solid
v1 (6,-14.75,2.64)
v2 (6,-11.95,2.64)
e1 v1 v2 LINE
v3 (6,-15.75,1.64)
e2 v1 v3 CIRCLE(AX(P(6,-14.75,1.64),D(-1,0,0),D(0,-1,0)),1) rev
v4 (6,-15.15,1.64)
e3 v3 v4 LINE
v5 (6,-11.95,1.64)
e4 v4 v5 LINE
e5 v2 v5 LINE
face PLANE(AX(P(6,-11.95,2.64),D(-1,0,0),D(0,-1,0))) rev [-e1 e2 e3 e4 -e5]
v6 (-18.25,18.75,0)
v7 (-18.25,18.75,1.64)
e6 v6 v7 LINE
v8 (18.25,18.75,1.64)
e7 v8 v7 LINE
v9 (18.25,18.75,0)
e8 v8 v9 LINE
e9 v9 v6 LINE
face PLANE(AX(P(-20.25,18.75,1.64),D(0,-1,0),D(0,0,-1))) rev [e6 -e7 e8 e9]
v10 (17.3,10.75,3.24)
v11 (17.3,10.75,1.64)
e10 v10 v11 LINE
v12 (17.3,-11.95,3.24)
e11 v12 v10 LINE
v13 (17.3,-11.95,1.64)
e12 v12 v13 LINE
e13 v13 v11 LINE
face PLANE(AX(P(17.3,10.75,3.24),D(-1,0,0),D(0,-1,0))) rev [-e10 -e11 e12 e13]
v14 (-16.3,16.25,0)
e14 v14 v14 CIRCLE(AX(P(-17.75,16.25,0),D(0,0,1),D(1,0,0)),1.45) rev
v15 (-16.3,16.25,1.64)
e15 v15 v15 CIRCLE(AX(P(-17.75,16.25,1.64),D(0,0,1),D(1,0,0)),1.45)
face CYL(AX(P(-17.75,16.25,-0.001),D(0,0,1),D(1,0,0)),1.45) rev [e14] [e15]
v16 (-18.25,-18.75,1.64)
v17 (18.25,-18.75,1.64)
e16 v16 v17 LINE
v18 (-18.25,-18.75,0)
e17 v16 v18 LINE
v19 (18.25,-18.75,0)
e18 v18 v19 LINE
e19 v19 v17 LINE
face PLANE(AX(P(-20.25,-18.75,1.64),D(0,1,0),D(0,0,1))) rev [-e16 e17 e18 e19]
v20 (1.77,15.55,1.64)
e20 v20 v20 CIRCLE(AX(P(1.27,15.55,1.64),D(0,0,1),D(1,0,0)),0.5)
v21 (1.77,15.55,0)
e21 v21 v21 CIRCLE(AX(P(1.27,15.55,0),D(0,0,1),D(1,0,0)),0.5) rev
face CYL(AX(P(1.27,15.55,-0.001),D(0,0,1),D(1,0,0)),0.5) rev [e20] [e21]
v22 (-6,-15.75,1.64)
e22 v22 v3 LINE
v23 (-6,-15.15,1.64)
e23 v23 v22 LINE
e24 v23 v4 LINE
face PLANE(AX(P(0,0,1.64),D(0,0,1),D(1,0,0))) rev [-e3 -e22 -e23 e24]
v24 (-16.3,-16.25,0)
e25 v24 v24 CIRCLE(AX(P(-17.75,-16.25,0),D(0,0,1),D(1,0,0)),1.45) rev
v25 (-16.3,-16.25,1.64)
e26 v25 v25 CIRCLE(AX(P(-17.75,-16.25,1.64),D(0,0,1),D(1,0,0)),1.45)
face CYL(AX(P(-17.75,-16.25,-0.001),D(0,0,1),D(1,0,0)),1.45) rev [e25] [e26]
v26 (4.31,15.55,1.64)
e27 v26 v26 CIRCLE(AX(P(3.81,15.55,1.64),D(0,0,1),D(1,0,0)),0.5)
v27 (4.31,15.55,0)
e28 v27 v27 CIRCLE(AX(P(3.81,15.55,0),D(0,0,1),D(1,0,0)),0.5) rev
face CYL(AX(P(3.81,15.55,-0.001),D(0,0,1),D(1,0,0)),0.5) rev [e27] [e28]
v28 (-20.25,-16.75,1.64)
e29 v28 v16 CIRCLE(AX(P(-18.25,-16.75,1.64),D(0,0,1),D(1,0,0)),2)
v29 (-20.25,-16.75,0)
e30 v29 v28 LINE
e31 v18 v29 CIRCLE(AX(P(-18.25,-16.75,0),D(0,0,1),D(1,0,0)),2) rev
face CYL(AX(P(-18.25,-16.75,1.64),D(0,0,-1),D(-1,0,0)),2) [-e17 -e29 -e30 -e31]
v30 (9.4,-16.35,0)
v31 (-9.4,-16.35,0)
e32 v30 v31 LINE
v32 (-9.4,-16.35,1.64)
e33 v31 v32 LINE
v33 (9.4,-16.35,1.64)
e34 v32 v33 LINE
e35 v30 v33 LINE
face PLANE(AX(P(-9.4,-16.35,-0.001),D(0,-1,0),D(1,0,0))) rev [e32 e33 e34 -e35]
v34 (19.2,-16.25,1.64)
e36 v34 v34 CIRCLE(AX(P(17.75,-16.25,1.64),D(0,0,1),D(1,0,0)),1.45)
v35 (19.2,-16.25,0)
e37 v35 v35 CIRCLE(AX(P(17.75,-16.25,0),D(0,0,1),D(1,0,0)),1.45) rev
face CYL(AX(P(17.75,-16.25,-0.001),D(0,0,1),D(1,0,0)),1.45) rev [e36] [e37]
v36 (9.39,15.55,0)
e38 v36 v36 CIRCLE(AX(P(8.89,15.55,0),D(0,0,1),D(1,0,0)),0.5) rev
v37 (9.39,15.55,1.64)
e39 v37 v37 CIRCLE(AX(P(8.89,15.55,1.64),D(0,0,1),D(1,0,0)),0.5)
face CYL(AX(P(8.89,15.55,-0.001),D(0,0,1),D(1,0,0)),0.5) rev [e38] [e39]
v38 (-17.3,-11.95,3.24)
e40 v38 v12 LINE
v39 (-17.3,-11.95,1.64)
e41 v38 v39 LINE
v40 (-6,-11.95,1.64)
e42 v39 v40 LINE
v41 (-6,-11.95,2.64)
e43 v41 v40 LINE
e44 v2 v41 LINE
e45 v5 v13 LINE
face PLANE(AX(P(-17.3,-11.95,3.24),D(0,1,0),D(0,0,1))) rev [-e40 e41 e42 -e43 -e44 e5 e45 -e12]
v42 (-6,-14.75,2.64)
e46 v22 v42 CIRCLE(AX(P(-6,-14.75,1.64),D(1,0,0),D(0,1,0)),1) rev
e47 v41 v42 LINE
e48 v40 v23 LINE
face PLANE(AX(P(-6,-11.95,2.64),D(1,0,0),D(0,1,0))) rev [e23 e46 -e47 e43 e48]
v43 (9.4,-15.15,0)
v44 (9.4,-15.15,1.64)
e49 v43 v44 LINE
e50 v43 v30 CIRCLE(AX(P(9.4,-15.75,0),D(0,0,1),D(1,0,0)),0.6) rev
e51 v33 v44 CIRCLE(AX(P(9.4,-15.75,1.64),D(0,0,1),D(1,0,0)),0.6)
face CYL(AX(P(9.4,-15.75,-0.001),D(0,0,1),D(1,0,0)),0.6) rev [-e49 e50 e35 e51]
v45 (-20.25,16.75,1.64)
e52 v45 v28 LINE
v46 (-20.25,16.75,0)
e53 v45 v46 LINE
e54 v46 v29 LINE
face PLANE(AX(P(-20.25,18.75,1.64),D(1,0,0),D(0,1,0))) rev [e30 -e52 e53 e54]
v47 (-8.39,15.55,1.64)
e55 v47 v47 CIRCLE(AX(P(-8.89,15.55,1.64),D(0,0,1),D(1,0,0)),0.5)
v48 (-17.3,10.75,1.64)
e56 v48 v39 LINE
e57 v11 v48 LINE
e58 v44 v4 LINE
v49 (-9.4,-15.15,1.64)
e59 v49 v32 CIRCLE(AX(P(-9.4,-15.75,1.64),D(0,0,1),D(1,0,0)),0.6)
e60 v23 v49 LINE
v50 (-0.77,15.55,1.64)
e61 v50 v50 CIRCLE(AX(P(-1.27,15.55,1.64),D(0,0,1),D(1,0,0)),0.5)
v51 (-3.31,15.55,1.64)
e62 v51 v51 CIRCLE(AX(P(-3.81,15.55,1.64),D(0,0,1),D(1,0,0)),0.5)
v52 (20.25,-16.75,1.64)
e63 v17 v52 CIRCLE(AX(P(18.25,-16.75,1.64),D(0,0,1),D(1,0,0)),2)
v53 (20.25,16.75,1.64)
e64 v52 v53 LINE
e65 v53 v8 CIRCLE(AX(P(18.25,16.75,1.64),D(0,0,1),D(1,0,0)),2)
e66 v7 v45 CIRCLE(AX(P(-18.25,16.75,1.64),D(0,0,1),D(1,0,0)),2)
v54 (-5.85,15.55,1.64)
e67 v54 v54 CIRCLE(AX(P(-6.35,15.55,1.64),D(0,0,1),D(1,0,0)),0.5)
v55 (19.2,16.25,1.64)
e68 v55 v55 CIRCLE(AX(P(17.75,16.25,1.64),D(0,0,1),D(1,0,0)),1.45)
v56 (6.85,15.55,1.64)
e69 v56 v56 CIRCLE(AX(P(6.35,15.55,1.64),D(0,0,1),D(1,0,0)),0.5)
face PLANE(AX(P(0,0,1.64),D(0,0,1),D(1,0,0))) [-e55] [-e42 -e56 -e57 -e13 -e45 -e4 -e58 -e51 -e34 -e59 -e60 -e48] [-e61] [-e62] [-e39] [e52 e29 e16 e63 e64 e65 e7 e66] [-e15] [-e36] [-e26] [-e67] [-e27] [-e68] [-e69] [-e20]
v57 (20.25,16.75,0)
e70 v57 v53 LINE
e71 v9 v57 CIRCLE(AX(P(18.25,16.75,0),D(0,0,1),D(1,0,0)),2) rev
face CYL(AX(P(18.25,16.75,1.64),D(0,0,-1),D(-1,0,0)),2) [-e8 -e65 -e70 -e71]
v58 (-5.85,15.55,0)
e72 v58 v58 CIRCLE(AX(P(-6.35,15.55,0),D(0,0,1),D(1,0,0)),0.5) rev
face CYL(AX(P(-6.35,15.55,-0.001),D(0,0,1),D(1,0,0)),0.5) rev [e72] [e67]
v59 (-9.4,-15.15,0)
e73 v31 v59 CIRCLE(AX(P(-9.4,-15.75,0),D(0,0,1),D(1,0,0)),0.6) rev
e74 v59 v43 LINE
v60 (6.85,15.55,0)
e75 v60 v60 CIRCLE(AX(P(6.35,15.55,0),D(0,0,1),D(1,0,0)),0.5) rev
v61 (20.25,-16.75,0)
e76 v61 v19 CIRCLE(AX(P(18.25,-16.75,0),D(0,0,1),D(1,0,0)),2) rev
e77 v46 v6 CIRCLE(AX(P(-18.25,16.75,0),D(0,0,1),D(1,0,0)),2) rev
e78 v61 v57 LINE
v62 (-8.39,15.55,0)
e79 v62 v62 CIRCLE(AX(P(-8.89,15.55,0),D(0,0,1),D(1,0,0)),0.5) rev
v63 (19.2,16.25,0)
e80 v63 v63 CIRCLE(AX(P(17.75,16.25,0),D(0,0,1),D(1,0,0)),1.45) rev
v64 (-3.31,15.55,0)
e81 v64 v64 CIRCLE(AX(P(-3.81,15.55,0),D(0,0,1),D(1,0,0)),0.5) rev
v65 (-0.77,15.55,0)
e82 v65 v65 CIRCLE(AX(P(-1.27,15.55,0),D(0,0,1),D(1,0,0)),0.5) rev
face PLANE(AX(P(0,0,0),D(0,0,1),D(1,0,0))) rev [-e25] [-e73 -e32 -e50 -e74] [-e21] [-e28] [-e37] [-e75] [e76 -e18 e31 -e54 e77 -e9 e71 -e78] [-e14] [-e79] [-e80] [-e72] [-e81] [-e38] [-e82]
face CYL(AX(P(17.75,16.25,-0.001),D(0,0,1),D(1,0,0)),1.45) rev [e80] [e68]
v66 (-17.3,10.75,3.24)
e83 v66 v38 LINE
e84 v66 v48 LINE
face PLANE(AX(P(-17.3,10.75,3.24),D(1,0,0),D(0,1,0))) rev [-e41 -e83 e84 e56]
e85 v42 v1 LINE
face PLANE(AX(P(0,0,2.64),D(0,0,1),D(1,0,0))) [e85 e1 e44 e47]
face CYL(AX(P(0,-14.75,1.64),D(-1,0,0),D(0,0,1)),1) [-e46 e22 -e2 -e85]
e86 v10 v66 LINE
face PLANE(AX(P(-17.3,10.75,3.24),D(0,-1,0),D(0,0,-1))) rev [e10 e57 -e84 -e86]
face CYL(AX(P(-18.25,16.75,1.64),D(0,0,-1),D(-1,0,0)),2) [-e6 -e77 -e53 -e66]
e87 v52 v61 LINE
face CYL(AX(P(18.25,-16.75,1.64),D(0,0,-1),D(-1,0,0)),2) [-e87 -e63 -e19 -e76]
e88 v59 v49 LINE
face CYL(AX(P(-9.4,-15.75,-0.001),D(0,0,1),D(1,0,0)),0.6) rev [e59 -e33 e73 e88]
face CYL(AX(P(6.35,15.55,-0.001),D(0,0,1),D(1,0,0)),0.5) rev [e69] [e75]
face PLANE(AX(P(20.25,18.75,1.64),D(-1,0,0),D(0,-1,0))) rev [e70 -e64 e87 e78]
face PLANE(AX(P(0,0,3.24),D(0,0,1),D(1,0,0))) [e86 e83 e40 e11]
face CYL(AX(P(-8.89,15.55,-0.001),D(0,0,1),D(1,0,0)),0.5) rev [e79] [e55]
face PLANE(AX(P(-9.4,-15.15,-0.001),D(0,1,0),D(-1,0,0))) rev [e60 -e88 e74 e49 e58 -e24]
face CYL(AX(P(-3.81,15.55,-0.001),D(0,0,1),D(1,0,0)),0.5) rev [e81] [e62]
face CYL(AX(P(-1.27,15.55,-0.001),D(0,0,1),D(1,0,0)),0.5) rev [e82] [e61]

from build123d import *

# Parameters (mm, degrees)
SKETCH1_W           = 40.5
SKETCH1_H           = 37.5
PCB_DEPTH           = 1.64
FILLET1_R           = 2
MOUNT_HOLE_REACH    = 29.646
SKETCH2_R           = 1.45
SLOT_REACH          = 29.646
CUT_EXTRUDE3_REACH  = 29.646
SKETCH4_R           = 0.5
SKETCH5_W           = 34.6
SKETCH5_H           = 22.7
OLED_GLASS_DEPTH    = 1.6
SKETCH6_W           = 12
SKETCH6_H           = 3.8
BOSS_EXTRUDE3_DEPTH = 1
FILLET2_R           = 1


with BuildPart() as part:
    # Sketch1 → PCB (new body)
    with BuildSketch(Plane.XY):
        Rectangle(SKETCH1_W, SKETCH1_H)
    extrude(amount=PCB_DEPTH)

    # Fillet1
    fillet1_edges = [part.edges().sort_by_distance(p)[0] for p in [
        (-20.25, 18.75, 0.82),
        (20.25, 18.75, 0.82),
        (20.25, -18.75, 0.82),
        (-20.25, -18.75, 0.82),
    ]]
    fillet(fillet1_edges, radius=FILLET1_R)

    # Sketch2 → mount hole (cut, up to next)
    with BuildSketch(Plane.XY.offset(1.64), mode=Mode.PRIVATE) as mount_hole_sk1:
        with Locations((-17.75, 16.25)):
            Circle(SKETCH2_R)
    mount_hole_tool1 = extrude(mount_hole_sk1.sketch, amount=-MOUNT_HOLE_REACH, mode=Mode.PRIVATE) & part.part
    # Sketch2 → mount hole (cut, up to next)
    with BuildSketch(Plane.XY.offset(1.64), mode=Mode.PRIVATE) as mount_hole_sk2:
        with Locations((17.75, 16.25)):
            Circle(SKETCH2_R)
    mount_hole_tool2 = extrude(mount_hole_sk2.sketch, amount=-MOUNT_HOLE_REACH, mode=Mode.PRIVATE) & part.part
    # Sketch2 → mount hole (cut, up to next)
    with BuildSketch(Plane.XY.offset(1.64), mode=Mode.PRIVATE) as mount_hole_sk3:
        with Locations((17.75, -16.25)):
            Circle(SKETCH2_R)
    mount_hole_tool3 = extrude(mount_hole_sk3.sketch, amount=-MOUNT_HOLE_REACH, mode=Mode.PRIVATE) & part.part
    # Sketch2 → mount hole (cut, up to next)
    with BuildSketch(Plane.XY.offset(1.64), mode=Mode.PRIVATE) as mount_hole_sk4:
        with Locations((-17.75, -16.25)):
            Circle(SKETCH2_R)
    mount_hole_tool4 = extrude(mount_hole_sk4.sketch, amount=-MOUNT_HOLE_REACH, mode=Mode.PRIVATE) & part.part
    add(mount_hole_tool1.solids().sort_by_distance((-17.75, 16.25, 1.64))[0], mode=Mode.SUBTRACT)
    add(mount_hole_tool2.solids().sort_by_distance((17.75, 16.25, 1.64))[0], mode=Mode.SUBTRACT)
    add(mount_hole_tool3.solids().sort_by_distance((17.75, -16.25, 1.64))[0], mode=Mode.SUBTRACT)
    add(mount_hole_tool4.solids().sort_by_distance((-17.75, -16.25, 1.64))[0], mode=Mode.SUBTRACT)

    # Sketch3 → slot (cut, up to next)
    with BuildSketch(Plane.XY.offset(1.64), mode=Mode.PRIVATE) as slot_sk1:
        with BuildLine():
            Line((-9.4, -15.15), (9.4, -15.15))
            ThreePointArc((9.4, -15.15), (10, -15.75), (9.4, -16.35))
            Line((9.4, -16.35), (-9.4, -16.35))
            ThreePointArc((-9.4, -16.35), (-10, -15.75), (-9.4, -15.15))
        make_face()
    slot_tool1 = extrude(slot_sk1.sketch, amount=-SLOT_REACH, mode=Mode.PRIVATE) & part.part
    add(slot_tool1.solids().sort_by_distance((0, -15.75, 1.64))[0], mode=Mode.SUBTRACT)

    # Sketch4 → Cut-Extrude3 (cut, up to next)
    with BuildSketch(Plane.XY.offset(1.64), mode=Mode.PRIVATE) as cut_extrude3_sk1:
        with Locations((-8.89, 15.55)):
            Circle(SKETCH4_R)
    cut_extrude3_tool1 = extrude(cut_extrude3_sk1.sketch, amount=-CUT_EXTRUDE3_REACH, mode=Mode.PRIVATE) & part.part
    # Sketch4 → Cut-Extrude3 (cut, up to next)
    with BuildSketch(Plane.XY.offset(1.64), mode=Mode.PRIVATE) as cut_extrude3_sk2:
        with Locations((-6.35, 15.55)):
            Circle(SKETCH4_R)
    cut_extrude3_tool2 = extrude(cut_extrude3_sk2.sketch, amount=-CUT_EXTRUDE3_REACH, mode=Mode.PRIVATE) & part.part
    # Sketch4 → Cut-Extrude3 (cut, up to next)
    with BuildSketch(Plane.XY.offset(1.64), mode=Mode.PRIVATE) as cut_extrude3_sk3:
        with Locations((-3.81, 15.55)):
            Circle(SKETCH4_R)
    cut_extrude3_tool3 = extrude(cut_extrude3_sk3.sketch, amount=-CUT_EXTRUDE3_REACH, mode=Mode.PRIVATE) & part.part
    # Sketch4 → Cut-Extrude3 (cut, up to next)
    with BuildSketch(Plane.XY.offset(1.64), mode=Mode.PRIVATE) as cut_extrude3_sk4:
        with Locations((-1.27, 15.55)):
            Circle(SKETCH4_R)
    cut_extrude3_tool4 = extrude(cut_extrude3_sk4.sketch, amount=-CUT_EXTRUDE3_REACH, mode=Mode.PRIVATE) & part.part
    # Sketch4 → Cut-Extrude3 (cut, up to next)
    with BuildSketch(Plane.XY.offset(1.64), mode=Mode.PRIVATE) as cut_extrude3_sk5:
        with Locations((1.27, 15.55)):
            Circle(SKETCH4_R)
    cut_extrude3_tool5 = extrude(cut_extrude3_sk5.sketch, amount=-CUT_EXTRUDE3_REACH, mode=Mode.PRIVATE) & part.part
    # Sketch4 → Cut-Extrude3 (cut, up to next)
    with BuildSketch(Plane.XY.offset(1.64), mode=Mode.PRIVATE) as cut_extrude3_sk6:
        with Locations((3.81, 15.55)):
            Circle(SKETCH4_R)
    cut_extrude3_tool6 = extrude(cut_extrude3_sk6.sketch, amount=-CUT_EXTRUDE3_REACH, mode=Mode.PRIVATE) & part.part
    # Sketch4 → Cut-Extrude3 (cut, up to next)
    with BuildSketch(Plane.XY.offset(1.64), mode=Mode.PRIVATE) as cut_extrude3_sk7:
        with Locations((6.35, 15.55)):
            Circle(SKETCH4_R)
    cut_extrude3_tool7 = extrude(cut_extrude3_sk7.sketch, amount=-CUT_EXTRUDE3_REACH, mode=Mode.PRIVATE) & part.part
    # Sketch4 → Cut-Extrude3 (cut, up to next)
    with BuildSketch(Plane.XY.offset(1.64), mode=Mode.PRIVATE) as cut_extrude3_sk8:
        with Locations((8.89, 15.55)):
            Circle(SKETCH4_R)
    cut_extrude3_tool8 = extrude(cut_extrude3_sk8.sketch, amount=-CUT_EXTRUDE3_REACH, mode=Mode.PRIVATE) & part.part
    add(cut_extrude3_tool1.solids().sort_by_distance((-8.89, 15.55, 1.64))[0], mode=Mode.SUBTRACT)
    add(cut_extrude3_tool2.solids().sort_by_distance((-6.35, 15.55, 1.64))[0], mode=Mode.SUBTRACT)
    add(cut_extrude3_tool3.solids().sort_by_distance((-3.81, 15.55, 1.64))[0], mode=Mode.SUBTRACT)
    add(cut_extrude3_tool4.solids().sort_by_distance((-1.27, 15.55, 1.64))[0], mode=Mode.SUBTRACT)
    add(cut_extrude3_tool5.solids().sort_by_distance((1.27, 15.55, 1.64))[0], mode=Mode.SUBTRACT)
    add(cut_extrude3_tool6.solids().sort_by_distance((3.81, 15.55, 1.64))[0], mode=Mode.SUBTRACT)
    add(cut_extrude3_tool7.solids().sort_by_distance((6.35, 15.55, 1.64))[0], mode=Mode.SUBTRACT)
    add(cut_extrude3_tool8.solids().sort_by_distance((8.89, 15.55, 1.64))[0], mode=Mode.SUBTRACT)

    # Sketch5 → OLED glass (add)
    with BuildSketch(Plane.XY.offset(1.64)):
        with Locations((0, -0.6)):
            Rectangle(SKETCH5_W, SKETCH5_H)
    extrude(amount=OLED_GLASS_DEPTH)

    # Sketch6 → Boss-Extrude3 (add)
    with BuildSketch(Plane.XY.offset(1.64)):
        with Locations((0, -13.85)):
            Rectangle(SKETCH6_W, SKETCH6_H)
    extrude(amount=BOSS_EXTRUDE3_DEPTH)

    # Fillet2
    fillet2_edges = [part.edges().sort_by_distance(p)[0] for p in [
        (0, -15.75, 2.64),
    ]]
    fillet(fillet2_edges, radius=FILLET2_R - 0.0001)  # a hair under: the kernel refuses the full size


solid = part.part
